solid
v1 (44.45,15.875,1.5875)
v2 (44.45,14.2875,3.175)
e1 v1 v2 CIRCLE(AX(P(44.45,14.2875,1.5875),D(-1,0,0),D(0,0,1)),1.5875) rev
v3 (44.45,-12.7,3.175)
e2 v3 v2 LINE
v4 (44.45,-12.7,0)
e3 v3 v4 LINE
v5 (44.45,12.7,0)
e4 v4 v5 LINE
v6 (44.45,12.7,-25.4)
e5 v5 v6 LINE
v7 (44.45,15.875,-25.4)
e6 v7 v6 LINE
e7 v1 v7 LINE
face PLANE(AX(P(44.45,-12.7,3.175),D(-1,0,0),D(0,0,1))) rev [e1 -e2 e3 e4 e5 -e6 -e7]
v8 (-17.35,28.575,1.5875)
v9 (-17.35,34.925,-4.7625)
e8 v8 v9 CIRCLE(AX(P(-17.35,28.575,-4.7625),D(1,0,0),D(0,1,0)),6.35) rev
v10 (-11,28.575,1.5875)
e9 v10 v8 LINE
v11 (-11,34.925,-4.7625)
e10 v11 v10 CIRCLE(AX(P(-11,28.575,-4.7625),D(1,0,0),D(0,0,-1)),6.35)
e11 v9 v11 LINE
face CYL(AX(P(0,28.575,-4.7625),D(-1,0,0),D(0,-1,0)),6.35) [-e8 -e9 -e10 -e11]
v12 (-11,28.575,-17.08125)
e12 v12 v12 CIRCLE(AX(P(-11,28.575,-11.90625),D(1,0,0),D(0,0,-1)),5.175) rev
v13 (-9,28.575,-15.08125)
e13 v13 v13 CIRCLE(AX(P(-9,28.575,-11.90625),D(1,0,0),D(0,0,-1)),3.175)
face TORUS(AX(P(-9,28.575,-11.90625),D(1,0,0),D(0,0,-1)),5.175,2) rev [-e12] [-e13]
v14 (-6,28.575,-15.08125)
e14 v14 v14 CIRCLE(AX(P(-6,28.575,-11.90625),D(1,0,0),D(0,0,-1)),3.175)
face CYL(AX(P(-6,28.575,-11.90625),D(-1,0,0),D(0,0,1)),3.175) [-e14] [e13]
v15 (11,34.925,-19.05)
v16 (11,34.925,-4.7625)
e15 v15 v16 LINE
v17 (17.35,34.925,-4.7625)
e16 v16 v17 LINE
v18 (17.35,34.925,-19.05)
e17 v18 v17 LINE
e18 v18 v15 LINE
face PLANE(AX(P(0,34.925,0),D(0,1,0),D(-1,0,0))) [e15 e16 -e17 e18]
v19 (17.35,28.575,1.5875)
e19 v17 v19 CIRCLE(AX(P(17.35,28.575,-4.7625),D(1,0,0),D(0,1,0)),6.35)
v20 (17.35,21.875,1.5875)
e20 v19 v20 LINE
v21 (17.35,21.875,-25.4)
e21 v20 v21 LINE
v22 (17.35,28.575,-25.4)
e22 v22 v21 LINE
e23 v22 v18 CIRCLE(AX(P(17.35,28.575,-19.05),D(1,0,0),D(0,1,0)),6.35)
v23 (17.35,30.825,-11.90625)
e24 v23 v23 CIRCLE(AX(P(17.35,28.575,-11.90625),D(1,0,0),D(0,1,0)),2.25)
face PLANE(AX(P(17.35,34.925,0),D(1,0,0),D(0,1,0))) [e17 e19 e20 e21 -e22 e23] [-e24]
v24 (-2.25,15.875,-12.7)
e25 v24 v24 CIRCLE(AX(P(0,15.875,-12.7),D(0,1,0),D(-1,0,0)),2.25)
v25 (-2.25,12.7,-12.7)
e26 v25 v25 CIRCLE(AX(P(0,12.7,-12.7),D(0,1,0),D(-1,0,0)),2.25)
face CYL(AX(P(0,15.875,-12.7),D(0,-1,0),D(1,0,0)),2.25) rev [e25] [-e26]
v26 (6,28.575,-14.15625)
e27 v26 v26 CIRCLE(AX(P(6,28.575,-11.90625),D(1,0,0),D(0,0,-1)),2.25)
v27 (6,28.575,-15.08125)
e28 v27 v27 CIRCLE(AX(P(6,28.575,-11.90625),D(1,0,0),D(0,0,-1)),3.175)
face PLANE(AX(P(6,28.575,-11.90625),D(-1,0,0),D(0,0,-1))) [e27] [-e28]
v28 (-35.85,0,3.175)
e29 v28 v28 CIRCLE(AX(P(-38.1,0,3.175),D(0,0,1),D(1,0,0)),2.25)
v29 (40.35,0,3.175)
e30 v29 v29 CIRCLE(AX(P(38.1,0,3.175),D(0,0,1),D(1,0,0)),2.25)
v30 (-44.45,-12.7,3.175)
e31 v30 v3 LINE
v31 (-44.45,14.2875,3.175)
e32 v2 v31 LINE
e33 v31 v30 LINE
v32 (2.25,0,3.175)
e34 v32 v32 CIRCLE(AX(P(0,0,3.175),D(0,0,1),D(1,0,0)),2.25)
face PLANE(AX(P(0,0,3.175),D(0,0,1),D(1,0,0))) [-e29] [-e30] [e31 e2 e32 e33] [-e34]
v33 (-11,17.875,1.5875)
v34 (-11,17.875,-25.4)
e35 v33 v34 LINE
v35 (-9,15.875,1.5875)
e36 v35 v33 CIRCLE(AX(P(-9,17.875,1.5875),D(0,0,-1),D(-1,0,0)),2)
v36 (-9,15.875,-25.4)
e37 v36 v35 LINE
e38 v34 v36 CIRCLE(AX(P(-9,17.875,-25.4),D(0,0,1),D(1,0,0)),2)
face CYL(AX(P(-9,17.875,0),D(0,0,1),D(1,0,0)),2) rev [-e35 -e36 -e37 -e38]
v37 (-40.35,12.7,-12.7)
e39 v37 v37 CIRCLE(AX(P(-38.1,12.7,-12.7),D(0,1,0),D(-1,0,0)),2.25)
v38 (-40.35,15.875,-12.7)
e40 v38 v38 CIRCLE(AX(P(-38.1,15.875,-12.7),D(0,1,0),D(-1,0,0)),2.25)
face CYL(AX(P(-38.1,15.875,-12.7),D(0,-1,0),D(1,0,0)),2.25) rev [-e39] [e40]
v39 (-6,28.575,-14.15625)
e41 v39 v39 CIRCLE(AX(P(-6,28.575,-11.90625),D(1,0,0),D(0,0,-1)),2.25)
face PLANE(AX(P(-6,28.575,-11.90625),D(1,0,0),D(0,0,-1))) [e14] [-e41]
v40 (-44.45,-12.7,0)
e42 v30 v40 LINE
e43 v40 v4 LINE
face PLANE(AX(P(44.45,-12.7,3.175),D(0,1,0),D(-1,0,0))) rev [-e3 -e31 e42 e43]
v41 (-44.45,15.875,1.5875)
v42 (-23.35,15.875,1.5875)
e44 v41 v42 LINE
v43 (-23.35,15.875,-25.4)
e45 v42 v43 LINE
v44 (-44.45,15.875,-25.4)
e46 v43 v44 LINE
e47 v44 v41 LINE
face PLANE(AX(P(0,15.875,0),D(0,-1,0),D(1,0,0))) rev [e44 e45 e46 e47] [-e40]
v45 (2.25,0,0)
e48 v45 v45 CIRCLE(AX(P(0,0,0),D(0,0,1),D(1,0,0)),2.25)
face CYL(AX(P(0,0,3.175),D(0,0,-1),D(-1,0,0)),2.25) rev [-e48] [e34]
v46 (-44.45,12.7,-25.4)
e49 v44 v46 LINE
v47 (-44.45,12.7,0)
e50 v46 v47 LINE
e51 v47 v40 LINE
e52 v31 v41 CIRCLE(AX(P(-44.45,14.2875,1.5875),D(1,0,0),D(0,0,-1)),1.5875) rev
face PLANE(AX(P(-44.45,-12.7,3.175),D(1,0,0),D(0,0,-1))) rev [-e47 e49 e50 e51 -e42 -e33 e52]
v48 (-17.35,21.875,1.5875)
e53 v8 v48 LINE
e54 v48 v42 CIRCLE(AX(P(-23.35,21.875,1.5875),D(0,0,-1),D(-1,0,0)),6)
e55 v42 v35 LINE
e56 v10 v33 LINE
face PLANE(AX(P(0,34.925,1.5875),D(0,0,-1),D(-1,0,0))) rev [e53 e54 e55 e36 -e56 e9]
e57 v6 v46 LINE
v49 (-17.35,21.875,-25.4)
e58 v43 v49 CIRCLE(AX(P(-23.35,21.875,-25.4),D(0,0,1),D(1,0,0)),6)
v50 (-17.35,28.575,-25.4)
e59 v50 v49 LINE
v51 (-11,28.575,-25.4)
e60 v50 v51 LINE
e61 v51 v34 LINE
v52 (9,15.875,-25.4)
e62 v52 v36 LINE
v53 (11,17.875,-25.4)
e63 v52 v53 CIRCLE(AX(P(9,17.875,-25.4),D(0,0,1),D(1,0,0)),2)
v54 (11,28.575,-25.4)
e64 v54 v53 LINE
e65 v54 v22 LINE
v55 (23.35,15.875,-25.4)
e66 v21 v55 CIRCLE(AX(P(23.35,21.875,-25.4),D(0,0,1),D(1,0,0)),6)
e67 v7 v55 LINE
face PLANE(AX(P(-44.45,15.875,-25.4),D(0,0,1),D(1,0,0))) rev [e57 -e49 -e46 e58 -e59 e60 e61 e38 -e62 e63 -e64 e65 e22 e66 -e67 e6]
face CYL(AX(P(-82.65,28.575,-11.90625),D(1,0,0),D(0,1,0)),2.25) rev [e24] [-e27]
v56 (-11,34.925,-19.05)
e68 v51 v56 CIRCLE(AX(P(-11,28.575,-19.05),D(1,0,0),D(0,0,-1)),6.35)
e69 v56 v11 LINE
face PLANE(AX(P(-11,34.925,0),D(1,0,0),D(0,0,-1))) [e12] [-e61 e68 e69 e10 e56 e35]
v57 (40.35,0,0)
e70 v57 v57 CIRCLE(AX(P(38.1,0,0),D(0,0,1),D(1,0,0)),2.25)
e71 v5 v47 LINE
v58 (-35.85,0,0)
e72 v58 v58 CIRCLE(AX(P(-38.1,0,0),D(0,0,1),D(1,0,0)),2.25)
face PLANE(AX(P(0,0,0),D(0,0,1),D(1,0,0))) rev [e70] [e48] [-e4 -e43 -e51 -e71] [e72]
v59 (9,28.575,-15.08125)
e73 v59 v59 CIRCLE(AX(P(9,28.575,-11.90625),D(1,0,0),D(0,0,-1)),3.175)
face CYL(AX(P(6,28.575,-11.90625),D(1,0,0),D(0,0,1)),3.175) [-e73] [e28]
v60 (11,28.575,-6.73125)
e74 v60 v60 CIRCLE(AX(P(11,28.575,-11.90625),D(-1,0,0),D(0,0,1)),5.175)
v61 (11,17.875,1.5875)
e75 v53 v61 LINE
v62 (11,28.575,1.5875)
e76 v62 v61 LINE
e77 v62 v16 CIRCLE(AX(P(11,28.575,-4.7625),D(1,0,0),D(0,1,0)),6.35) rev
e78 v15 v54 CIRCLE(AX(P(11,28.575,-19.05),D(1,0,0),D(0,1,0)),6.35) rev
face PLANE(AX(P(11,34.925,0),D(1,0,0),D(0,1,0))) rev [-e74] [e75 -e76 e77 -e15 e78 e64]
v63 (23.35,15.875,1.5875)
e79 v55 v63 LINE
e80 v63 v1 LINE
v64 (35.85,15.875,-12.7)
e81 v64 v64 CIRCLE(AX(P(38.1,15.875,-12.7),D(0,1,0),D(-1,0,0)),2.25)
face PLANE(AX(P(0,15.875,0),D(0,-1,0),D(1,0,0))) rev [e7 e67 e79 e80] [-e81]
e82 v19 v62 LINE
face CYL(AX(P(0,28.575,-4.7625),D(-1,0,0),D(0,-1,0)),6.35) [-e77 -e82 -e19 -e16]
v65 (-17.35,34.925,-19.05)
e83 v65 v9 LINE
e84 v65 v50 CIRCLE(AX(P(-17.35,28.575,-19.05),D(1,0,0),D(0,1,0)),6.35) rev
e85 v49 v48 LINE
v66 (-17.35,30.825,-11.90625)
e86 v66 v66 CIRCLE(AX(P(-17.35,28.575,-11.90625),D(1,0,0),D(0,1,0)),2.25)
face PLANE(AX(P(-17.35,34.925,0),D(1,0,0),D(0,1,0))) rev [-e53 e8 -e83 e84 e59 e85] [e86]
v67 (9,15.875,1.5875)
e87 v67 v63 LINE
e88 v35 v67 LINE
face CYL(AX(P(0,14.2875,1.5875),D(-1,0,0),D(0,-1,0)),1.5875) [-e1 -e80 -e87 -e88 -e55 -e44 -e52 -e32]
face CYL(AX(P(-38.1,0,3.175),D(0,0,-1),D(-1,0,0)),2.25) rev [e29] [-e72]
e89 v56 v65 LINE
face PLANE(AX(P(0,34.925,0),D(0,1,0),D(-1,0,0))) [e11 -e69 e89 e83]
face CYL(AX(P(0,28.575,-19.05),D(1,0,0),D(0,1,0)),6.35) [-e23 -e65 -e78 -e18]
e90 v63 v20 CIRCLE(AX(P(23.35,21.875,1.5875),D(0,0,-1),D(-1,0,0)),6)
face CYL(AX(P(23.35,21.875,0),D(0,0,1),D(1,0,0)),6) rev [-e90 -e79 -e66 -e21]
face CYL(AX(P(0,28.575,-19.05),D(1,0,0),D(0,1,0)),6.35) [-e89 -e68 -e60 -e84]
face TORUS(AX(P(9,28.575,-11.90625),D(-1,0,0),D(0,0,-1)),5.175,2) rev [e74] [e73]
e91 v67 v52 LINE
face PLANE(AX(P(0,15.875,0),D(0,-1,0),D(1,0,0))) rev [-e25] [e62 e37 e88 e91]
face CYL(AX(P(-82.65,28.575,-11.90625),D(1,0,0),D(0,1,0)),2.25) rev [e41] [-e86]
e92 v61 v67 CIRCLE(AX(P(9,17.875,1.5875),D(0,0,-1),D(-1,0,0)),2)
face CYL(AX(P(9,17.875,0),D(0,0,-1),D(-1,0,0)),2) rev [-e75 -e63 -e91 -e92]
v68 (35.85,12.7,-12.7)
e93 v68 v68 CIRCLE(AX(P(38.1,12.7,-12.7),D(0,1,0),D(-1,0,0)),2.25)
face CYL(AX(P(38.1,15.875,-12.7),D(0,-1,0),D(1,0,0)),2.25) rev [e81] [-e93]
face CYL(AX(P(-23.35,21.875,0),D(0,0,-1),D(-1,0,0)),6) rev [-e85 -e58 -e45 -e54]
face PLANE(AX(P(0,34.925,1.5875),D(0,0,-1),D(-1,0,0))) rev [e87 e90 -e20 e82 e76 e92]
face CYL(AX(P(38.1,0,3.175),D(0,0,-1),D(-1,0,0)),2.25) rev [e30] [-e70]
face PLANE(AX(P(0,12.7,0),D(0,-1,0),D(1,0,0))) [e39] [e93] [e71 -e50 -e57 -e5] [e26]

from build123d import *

# Parameters (mm, degrees)
SKETCH1_W           = 88.9
SKETCH1_H           = 25.4
SKETCH1_R           = 2.25
BOSS_EXTRUDE1_DEPTH = 3.175
SKETCH2_W           = 88.9
SKETCH2_H           = 28.575
SKETCH2_R           = 2.25
BOSS_EXTRUDE2_DEPTH = 3.175
FILLET1_R           = 1.5875
BOSS_EXTRUDE3_DEPTH = 19.05
SKETCH5_R           = 2.25
CUT_EXTRUDE1_DEPTH  = 100
FILLET2_R           = 6.35
BOSS_EXTRUDE4_START = 5
SKETCH6_R           = 3.175
SKETCH6_R_2         = 2.25
BOSS_EXTRUDE4_DEPTH = 5
FILLET3_R           = 2
FILLET4_R           = 6
FILLET5_R           = 2


with BuildPart() as part:
    # Sketch1 → Boss-Extrude1 (new body)
    with BuildSketch(Plane.XY):
        Rectangle(SKETCH1_W, SKETCH1_H)
        Circle(SKETCH1_R, mode=Mode.SUBTRACT)
        with Locations((-38.1, 0)):
            Circle(SKETCH1_R, mode=Mode.SUBTRACT)
        with Locations((38.1, 0)):
            Circle(SKETCH1_R, mode=Mode.SUBTRACT)
    extrude(amount=BOSS_EXTRUDE1_DEPTH)

    # Sketch2 → Boss-Extrude2 (add)
    with BuildSketch(Plane(origin=(0, 12.7, 0), x_dir=(1, 0, 0), z_dir=(0, 1, 0))):
        with Locations((0, 11.1125)):
            Rectangle(SKETCH2_W, SKETCH2_H)
        with Locations(Location((0, 12.7, 0), (0, 0, 180))):
            Circle(SKETCH2_R, mode=Mode.SUBTRACT)
        with Locations(Location((-38.1, 12.7, 0), (0, 0, 180))):
            Circle(SKETCH2_R, mode=Mode.SUBTRACT)
        with Locations(Location((38.1, 12.7, 0), (0, 0, 180))):
            Circle(SKETCH2_R, mode=Mode.SUBTRACT)
    extrude(amount=BOSS_EXTRUDE2_DEPTH)

    # Fillet1
    fillet1_edges = [part.edges().sort_by_distance(p)[0] for p in [
        (0, 15.875, 3.175),
    ]]
    fillet(fillet1_edges, radius=FILLET1_R)

    # Sketch4 → Boss-Extrude3 (add)
    with BuildSketch(Plane(origin=(0, 15.875, 0), x_dir=(1, 0, 0), z_dir=(0, 1, 0))):
        Polygon((-11, 12.7), (-11, 25.4), (-17.35, 25.4), (-17.35, 12.7), (-17.35, -1.5875), (-11, -1.5875), align=None)
        Polygon((11, 25.4), (11, 12.7), (11, -1.5875), (17.35, -1.5875), (17.35, 12.7), (17.35, 25.4), align=None)
    extrude(amount=BOSS_EXTRUDE3_DEPTH)

    # Sketch5 → Cut-Extrude1 (cut)
    with BuildSketch(Plane(origin=(17.35, 0, 0), x_dir=(0, 0, -1), z_dir=(1, 0, 0))):
        with Locations(Location((11.90625, 28.575, 0), (0, 0, 90))):
            Circle(SKETCH5_R)
    extrude(amount=-CUT_EXTRUDE1_DEPTH, mode=Mode.SUBTRACT)

    # Fillet2
    fillet2_edges = [part.edges().sort_by_distance(p)[0] for p in [
        (-14.175, 34.925, -25.4),
        (-14.175, 34.925, 1.5875),
        (14.175, 34.925, -25.4),
        (14.175, 34.925, 1.5875),
    ]]
    fillet(fillet2_edges, radius=FILLET2_R)

    # Sketch6 → Boss-Extrude4 (add)
    with BuildSketch(Plane(origin=(-11, 0, 0), x_dir=(0, 0, -1), z_dir=(1, 0, 0)).offset(BOSS_EXTRUDE4_START)):
        with Locations((11.90625, 28.575)):
            Circle(SKETCH6_R)
        with Locations(Location((11.90625, 28.575, 0), (0, 0, 90))):
            Circle(SKETCH6_R_2, mode=Mode.SUBTRACT)
    extrude(amount=-BOSS_EXTRUDE4_DEPTH)

    # Fillet3
    fillet3_edges = [part.edges().sort_by_distance(p)[0] for p in [
        (-11, 28.575, -8.73125),
    ]]
    fillet(fillet3_edges, radius=FILLET3_R)

    # Mirror2: part across plane


with BuildPart() as part_1:
    add(part.part)
    add(part.part.mirror(Plane(origin=(0, 0, 0), x_dir=(0, 0, 1), z_dir=(1, 0, 0))))

    # Fillet4
    # the kernel refuses this fillet: 6 mm, written as the material it adds along each edge
    with BuildSketch(Plane(origin=(-17.35, 15.875, -25.4), x_dir=(0, 1, 0), z_dir=(0, 0, 1))) as fillet4_piece_1:
        with BuildLine():
            CenterArc((FILLET4_R, FILLET4_R), FILLET4_R, 180, 90)
            Line((0, FILLET4_R), (0, 0))
            Line((0, 0), (FILLET4_R, 0))
        make_face()
    extrude(amount=26.9875)
    with BuildSketch(Plane(origin=(17.35, 15.875, 1.5875), x_dir=(1, 0, 0), z_dir=(0, 0, -1))) as fillet4_piece_2:
        with BuildLine():
            CenterArc((FILLET4_R, -FILLET4_R), FILLET4_R, 90, 90)
            Line((0, -FILLET4_R), (0, 0))
            Line((0, 0), (FILLET4_R, 0))
        make_face()
    extrude(amount=26.9875)

    # Fillet5
    # the kernel refuses this fillet: 2 mm, written as the material it adds along each edge
    with BuildSketch(Plane(origin=(-11, 15.875, 1.5875), x_dir=(0, 1, 0), z_dir=(0, 0, -1))) as fillet5_piece_1:
        with BuildLine():
            CenterArc((FILLET5_R, FILLET5_R), FILLET5_R, 180, 90)
            Line((0, FILLET5_R), (0, 0))
            Line((0, 0), (FILLET5_R, 0))
        make_face()
    extrude(amount=26.9875)
    with BuildSketch(Plane(origin=(11, 15.875, -25.4), x_dir=(-1, 0, 0), z_dir=(0, 0, 1))) as fillet5_piece_2:
        with BuildLine():
            CenterArc((FILLET5_R, -FILLET5_R), FILLET5_R, 90, 90)
            Line((0, -FILLET5_R), (0, 0))
            Line((0, 0), (FILLET5_R, 0))
        make_face()
    extrude(amount=26.9875)


solid = part_1.part
